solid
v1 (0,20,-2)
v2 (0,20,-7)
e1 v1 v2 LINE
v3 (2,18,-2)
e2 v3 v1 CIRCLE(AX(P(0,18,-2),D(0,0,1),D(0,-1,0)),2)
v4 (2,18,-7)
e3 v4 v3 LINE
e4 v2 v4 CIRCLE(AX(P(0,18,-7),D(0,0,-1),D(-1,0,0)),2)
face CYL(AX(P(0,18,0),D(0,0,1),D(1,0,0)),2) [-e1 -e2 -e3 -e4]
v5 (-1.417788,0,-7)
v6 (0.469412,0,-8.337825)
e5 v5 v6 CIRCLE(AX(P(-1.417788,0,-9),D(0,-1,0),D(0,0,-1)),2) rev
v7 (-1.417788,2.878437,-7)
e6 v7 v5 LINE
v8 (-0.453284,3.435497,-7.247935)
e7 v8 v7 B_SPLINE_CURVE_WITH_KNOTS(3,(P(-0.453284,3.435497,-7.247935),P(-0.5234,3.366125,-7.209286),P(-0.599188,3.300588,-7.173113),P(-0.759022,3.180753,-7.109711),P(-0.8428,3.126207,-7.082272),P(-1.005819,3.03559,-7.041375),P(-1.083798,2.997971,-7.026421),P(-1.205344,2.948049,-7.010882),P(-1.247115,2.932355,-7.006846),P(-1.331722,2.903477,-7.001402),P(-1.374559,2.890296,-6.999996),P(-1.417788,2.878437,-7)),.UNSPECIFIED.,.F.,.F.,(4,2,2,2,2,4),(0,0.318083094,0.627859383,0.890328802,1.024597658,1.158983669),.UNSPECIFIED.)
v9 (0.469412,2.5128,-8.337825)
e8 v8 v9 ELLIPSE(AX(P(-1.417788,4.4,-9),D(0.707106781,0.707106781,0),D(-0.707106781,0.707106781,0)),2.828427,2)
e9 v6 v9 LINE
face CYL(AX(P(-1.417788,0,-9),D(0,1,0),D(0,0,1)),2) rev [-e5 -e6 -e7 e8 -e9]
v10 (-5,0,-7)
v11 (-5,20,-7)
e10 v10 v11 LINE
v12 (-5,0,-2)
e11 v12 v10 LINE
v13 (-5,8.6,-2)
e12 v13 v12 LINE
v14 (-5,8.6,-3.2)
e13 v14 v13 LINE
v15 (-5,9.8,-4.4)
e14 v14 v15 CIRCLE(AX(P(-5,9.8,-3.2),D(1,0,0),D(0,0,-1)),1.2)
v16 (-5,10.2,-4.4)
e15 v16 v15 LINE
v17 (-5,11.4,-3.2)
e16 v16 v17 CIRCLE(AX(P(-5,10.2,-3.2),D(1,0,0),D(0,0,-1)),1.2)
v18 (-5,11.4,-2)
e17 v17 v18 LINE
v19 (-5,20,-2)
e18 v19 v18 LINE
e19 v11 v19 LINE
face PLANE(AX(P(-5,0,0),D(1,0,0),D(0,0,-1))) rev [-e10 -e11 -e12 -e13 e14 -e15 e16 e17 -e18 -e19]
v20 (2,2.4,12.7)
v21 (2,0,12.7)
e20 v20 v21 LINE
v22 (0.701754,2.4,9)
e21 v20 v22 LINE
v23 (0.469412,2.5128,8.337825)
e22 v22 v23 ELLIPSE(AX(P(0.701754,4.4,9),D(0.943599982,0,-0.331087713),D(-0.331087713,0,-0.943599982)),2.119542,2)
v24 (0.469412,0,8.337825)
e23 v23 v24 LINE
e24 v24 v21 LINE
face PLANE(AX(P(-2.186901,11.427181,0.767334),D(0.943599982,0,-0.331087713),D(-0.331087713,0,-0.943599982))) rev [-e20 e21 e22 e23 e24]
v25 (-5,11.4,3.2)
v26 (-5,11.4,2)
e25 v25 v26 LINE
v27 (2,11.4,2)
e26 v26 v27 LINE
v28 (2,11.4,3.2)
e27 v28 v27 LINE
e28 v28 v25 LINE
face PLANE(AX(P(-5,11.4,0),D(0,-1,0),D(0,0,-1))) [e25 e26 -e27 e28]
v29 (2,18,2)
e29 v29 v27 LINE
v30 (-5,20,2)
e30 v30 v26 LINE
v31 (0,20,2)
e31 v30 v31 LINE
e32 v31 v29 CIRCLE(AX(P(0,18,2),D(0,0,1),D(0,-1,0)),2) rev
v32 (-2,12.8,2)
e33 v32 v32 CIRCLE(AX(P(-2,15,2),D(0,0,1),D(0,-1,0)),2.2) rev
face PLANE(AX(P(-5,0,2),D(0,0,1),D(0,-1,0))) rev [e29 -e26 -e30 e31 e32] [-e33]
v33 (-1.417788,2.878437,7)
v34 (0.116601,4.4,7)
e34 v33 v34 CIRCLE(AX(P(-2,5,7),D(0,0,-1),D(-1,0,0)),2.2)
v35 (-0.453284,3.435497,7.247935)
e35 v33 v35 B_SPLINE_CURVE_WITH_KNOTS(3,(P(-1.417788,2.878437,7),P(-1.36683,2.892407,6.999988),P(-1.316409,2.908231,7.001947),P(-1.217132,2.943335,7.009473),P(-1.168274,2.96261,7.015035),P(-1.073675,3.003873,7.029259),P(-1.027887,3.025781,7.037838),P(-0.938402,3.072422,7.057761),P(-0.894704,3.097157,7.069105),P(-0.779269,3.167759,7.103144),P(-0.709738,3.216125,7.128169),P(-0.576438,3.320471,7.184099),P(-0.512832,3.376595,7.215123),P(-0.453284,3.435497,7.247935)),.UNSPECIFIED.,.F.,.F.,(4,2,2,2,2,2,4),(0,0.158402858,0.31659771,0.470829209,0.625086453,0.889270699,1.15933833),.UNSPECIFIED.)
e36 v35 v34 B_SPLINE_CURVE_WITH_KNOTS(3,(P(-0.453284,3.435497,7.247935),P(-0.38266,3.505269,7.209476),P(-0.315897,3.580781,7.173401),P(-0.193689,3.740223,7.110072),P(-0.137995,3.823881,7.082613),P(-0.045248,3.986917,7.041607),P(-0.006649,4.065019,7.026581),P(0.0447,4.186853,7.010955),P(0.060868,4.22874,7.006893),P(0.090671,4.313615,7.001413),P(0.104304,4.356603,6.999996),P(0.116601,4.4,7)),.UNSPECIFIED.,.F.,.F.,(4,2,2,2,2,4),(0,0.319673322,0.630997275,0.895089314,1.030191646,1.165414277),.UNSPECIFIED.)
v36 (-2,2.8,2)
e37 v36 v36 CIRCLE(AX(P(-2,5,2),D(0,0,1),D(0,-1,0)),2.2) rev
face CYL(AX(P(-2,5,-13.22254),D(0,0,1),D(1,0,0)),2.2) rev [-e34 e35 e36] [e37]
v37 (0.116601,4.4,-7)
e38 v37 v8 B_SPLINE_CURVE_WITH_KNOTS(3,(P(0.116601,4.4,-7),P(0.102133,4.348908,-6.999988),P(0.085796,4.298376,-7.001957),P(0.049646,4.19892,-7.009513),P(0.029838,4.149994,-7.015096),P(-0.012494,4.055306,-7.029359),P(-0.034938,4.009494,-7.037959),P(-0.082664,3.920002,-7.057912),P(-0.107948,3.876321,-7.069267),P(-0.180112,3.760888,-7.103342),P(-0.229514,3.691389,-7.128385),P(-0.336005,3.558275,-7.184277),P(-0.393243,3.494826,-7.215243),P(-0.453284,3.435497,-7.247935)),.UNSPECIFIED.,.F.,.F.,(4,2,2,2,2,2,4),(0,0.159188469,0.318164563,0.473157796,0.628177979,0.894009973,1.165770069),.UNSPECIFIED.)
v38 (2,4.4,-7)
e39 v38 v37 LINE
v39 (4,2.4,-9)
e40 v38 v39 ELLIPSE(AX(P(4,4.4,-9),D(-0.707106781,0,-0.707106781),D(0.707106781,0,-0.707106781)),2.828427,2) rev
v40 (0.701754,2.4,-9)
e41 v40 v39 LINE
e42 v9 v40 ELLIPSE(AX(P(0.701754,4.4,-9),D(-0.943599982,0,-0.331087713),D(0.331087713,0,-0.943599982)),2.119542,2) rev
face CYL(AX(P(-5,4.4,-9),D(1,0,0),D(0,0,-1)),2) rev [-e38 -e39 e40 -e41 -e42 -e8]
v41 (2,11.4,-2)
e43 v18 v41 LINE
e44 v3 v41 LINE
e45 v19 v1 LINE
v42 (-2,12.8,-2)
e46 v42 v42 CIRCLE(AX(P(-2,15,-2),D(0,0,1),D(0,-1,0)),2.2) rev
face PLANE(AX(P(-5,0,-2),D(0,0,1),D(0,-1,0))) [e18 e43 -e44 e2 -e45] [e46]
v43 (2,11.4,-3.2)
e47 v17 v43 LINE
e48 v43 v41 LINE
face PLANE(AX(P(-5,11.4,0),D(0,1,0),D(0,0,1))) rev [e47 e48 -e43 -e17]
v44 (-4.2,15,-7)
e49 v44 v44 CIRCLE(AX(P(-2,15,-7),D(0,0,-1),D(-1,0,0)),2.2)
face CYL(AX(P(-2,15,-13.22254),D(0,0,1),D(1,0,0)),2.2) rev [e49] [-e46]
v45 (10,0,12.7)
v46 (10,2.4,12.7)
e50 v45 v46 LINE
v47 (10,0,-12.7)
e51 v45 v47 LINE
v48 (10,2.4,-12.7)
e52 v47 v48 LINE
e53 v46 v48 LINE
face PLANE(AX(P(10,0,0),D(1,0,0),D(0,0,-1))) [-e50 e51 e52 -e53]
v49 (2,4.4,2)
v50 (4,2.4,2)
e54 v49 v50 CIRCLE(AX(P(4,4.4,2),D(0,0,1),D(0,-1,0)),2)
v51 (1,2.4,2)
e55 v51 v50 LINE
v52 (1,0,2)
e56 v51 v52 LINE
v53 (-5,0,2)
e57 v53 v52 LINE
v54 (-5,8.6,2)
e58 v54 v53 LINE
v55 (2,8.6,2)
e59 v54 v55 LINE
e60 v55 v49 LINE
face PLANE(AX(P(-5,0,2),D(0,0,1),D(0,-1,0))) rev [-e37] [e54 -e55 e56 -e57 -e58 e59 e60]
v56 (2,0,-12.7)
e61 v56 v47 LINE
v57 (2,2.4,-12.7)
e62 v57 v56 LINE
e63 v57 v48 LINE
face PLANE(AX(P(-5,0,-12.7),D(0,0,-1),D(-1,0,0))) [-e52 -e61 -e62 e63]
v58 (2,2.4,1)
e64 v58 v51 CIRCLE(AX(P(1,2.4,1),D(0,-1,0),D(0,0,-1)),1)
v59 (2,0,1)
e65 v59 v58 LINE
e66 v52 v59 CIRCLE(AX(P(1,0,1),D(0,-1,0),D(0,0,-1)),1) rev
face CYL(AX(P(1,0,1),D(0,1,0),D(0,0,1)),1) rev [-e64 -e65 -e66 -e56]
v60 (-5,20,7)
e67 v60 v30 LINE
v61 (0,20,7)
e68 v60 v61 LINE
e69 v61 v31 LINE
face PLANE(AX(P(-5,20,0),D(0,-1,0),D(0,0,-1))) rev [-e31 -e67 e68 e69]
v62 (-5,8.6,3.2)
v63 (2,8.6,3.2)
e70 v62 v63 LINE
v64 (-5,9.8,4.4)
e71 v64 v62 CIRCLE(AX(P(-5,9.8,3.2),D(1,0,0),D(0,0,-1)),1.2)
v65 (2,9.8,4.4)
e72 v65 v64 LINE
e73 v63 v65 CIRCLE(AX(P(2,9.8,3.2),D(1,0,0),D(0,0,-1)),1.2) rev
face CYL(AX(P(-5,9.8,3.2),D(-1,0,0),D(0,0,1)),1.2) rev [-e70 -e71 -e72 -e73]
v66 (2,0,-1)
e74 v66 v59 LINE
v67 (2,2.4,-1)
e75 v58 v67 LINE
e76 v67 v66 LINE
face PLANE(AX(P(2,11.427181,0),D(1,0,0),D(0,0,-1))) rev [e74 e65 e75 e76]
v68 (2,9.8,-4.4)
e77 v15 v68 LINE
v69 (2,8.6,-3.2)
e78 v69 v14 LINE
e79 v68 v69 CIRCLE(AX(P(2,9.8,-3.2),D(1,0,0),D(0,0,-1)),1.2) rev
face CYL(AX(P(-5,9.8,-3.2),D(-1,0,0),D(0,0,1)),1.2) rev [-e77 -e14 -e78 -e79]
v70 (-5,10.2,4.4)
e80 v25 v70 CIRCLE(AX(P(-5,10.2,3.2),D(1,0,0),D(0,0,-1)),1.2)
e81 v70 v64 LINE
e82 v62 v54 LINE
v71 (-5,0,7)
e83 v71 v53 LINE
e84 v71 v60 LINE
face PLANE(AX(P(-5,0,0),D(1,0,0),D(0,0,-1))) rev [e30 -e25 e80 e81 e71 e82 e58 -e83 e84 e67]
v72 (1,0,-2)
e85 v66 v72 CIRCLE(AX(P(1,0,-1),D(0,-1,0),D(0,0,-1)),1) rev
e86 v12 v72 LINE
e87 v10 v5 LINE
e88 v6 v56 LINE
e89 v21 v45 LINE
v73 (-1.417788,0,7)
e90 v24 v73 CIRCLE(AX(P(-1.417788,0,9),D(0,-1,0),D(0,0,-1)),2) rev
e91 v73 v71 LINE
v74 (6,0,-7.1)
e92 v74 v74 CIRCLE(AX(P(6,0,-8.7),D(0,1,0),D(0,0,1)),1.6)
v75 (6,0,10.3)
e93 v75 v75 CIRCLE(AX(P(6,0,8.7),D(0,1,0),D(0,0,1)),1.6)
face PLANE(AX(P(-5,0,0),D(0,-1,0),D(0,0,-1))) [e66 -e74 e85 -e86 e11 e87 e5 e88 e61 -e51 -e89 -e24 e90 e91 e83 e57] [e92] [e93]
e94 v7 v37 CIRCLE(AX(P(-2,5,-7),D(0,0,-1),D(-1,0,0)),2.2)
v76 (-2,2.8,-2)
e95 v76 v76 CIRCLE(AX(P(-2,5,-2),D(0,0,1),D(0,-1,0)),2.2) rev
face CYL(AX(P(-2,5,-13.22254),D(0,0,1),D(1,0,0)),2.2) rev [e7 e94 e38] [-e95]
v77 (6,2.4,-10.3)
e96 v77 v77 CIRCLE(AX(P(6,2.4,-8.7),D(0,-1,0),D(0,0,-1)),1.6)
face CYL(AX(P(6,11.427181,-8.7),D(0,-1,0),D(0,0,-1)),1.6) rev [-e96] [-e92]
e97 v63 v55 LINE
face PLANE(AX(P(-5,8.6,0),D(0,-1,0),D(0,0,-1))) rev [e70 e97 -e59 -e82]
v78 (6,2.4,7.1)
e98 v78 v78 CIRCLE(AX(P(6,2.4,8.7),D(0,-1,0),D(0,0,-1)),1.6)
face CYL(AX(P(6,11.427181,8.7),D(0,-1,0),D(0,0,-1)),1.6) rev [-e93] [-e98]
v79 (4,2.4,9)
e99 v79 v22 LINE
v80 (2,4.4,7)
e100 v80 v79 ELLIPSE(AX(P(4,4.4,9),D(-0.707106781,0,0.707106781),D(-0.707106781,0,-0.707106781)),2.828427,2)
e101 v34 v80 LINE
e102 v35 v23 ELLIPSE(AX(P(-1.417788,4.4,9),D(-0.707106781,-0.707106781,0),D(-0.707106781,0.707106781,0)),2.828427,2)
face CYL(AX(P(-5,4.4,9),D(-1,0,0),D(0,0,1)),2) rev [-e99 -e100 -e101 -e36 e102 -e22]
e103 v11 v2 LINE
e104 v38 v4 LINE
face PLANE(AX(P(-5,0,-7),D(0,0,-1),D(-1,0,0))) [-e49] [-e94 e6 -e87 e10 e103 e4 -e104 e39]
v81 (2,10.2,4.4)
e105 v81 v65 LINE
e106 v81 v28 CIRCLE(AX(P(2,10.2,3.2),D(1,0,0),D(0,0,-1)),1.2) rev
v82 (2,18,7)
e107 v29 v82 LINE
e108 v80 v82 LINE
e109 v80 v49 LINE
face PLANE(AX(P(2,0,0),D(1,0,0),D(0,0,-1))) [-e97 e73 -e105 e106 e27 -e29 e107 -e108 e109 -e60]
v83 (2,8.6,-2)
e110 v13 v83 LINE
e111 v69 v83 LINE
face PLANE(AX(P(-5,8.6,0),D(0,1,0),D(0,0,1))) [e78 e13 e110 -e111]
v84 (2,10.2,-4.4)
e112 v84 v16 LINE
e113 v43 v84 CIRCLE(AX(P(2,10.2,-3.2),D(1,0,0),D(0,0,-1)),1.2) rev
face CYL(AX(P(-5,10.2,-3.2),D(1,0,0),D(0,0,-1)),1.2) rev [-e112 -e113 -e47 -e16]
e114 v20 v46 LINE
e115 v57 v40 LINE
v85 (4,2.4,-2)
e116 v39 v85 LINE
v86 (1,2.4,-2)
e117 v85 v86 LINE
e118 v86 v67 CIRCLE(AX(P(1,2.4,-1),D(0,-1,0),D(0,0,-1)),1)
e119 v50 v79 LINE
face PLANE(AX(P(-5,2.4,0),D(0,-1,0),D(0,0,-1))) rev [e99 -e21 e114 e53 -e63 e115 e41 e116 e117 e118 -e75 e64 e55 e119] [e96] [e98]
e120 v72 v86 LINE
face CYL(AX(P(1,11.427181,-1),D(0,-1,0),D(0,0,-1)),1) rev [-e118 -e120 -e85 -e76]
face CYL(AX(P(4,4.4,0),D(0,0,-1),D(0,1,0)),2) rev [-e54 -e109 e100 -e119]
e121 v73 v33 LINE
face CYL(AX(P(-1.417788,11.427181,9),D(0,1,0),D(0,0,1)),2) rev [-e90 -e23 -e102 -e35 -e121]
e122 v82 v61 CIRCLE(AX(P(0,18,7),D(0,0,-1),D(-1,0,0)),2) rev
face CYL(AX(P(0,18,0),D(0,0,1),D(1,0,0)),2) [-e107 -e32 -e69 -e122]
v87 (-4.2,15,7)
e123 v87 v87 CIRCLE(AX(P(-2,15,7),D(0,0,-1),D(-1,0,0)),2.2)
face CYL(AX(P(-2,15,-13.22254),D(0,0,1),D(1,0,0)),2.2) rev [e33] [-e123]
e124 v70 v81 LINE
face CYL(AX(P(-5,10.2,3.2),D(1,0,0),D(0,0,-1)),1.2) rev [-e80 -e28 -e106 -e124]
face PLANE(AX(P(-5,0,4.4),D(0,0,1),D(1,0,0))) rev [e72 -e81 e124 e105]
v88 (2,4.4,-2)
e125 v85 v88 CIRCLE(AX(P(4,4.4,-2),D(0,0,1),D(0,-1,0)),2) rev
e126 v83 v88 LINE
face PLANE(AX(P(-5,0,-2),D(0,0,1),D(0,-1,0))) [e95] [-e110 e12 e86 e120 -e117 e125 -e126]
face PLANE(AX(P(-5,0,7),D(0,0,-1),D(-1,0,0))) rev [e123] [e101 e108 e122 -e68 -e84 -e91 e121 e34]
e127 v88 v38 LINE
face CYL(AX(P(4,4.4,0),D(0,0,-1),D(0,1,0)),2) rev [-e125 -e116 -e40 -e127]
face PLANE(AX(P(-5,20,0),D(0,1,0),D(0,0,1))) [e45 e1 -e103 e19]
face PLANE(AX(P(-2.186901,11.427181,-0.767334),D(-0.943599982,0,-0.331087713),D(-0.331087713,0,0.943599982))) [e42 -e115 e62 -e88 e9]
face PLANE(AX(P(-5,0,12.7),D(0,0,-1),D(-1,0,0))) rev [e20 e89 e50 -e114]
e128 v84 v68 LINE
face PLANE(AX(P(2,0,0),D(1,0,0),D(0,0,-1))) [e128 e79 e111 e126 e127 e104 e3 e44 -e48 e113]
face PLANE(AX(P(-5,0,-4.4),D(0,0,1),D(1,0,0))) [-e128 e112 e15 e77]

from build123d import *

# Parameters (mm, degrees)
SALIENTE_EXTRUIR1_DEPTH = 5
SALIENTE_EXTRUIR2_DEPTH = 10
SALIENTE_EXTRUIR3_DEPTH = 2
CORTAR_EXTRUIR1_START   = 7
CROQUIS2_R              = 2.2
CORTAR_EXTRUIR1_DEPTH   = 14
CROQUIS3_R              = 1.6
CROQUIS3_W              = 5
CROQUIS3_H              = 4
CROQUIS3_W_2            = 2
CORTAR_EXTRUIR2_DEPTH   = 2.4
REDONDEO1_R             = 2
REDONDEO2_R             = 2
REDONDEO3_R             = 1
REDONDEO4_R             = 1.2


with BuildPart() as part:
    # Croquis1 → Saliente-Extruir1 (new body)
    with BuildSketch(Plane(origin=(0, 0, 0), x_dir=(0, 0, -1), z_dir=(1, 0, 0))):
        Polygon((-12.7, 2.4), (-12.7, 0), (12.7, 0), (12.7, 2.4), (7, 2.4), (7, 20), (2, 20), (2, 11.4), (4.4, 11.4), (4.4, 8.6), (2, 8.6), (2, 2.4), (-2, 2.4), (-2, 8.6), (-4.4, 8.6), (-4.4, 11.4), (-2, 11.4), (-2, 20), (-7, 20), (-7, 2.4), align=None)
    extrude(amount=-SALIENTE_EXTRUIR1_DEPTH)

    # Croquis1<3> → Saliente-Extruir2 (add)
    with BuildSketch(Plane(origin=(0, 0, 0), x_dir=(0, 0, -1), z_dir=(1, 0, 0))):
        Polygon((2, 2.4), (7, 2.4), (12.7, 2.4), (12.7, 0), (-12.7, 0), (-12.7, 2.4), (-7, 2.4), (-2, 2.4), align=None)
    extrude(amount=SALIENTE_EXTRUIR2_DEPTH)

    # Croquis1<4> → Saliente-Extruir3 (add)
    with BuildSketch(Plane(origin=(0, 0, 0), x_dir=(0, 0, -1), z_dir=(1, 0, 0))):
        Polygon((-7, 20), (-7, 2.4), (-2, 2.4), (-2, 8.6), (-4.4, 8.6), (-4.4, 11.4), (-2, 11.4), (-2, 20), align=None)
        Polygon((2, 2.4), (7, 2.4), (7, 20), (2, 20), (2, 11.4), (4.4, 11.4), (4.4, 8.6), (2, 8.6), align=None)
    extrude(amount=SALIENTE_EXTRUIR3_DEPTH)

    # Croquis2 → Cortar-Extruir1 (cut)
    with BuildSketch(Plane.XY.offset(CORTAR_EXTRUIR1_START)):
        with Locations(Location((-2, 15, 0), (0, 0, 270))):
            Circle(CROQUIS2_R)
        with Locations(Location((-2, 5, 0), (0, 0, 270))):
            Circle(CROQUIS2_R)
    extrude(amount=-CORTAR_EXTRUIR1_DEPTH, mode=Mode.SUBTRACT)

    # Croquis3 → Cortar-Extruir2 (cut)
    with BuildSketch(Plane(origin=(0, 0, 0), x_dir=(1, 0, 0), z_dir=(0, 1, 0))):
        Polygon((-5, 7), (0, 7), (2, 12.7), (-5, 12.7), align=None)
        Polygon((2, -12.7), (0, -7), (-5, -7), (-5, -12.7), align=None)
        with Locations(Location((6, -8.7, 0), (0, 0, 90))):
            Circle(CROQUIS3_R)
        with Locations(Location((6, 8.7, 0), (0, 0, 90))):
            Circle(CROQUIS3_R)
        with Locations((-2.5, 0)):
            Rectangle(CROQUIS3_W, CROQUIS3_H)
        with Locations((1, 0)):
            Rectangle(CROQUIS3_W_2, CROQUIS3_H)
    extrude(amount=CORTAR_EXTRUIR2_DEPTH, mode=Mode.SUBTRACT)

    # Redondeo1
    redondeo1_edges = [part.edges().sort_by_distance(p)[0] for p in [
        (2, 20, -4.5),
        (2, 20, 4.5),
    ]]
    fillet(redondeo1_edges, radius=REDONDEO1_R)

    # Redondeo2
    # the kernel refuses this fillet: 2 mm, written as the material it adds along each edge
    with BuildSketch(Plane(origin=(2, 2.4, 3), x_dir=(1, 0, 0), z_dir=(0, 0, -1))) as redondeo2_piece_1_section:
        with BuildLine():
            CenterArc((REDONDEO2_R, -REDONDEO2_R), REDONDEO2_R, 90, 90)
            Line((0, -REDONDEO2_R), (0, 0))
            Line((0, 0), (REDONDEO2_R, 0))
        make_face()
    redondeo2_piece_1 = extrude(amount=15, mode=Mode.PRIVATE)
    redondeo2_piece_1 = split(redondeo2_piece_1, bisect_by=Plane(origin=(2, 2.4, 2), z_dir=(0, 0, 1)), keep=Keep.TOP, mode=Mode.PRIVATE)
    add(redondeo2_piece_1)
    with BuildSketch(Plane(origin=(2, 2.4, -2), x_dir=(1, 0, 0), z_dir=(0, 0, -1))) as redondeo2_piece_2:
        with BuildLine():
            CenterArc((REDONDEO2_R, -REDONDEO2_R), REDONDEO2_R, 90, 90)
            Line((0, -REDONDEO2_R), (0, 0))
            Line((0, 0), (REDONDEO2_R, 0))
        make_face()
    extrude(amount=5)
    with BuildSketch(Plane(origin=(-5, 2.4, -7), x_dir=(0, 0, -1), z_dir=(1, 0, 0))) as redondeo2_piece_3_section:
        with BuildLine():
            CenterArc((REDONDEO2_R, REDONDEO2_R), REDONDEO2_R, 180, 90)
            Line((0, REDONDEO2_R), (0, 0))
            Line((0, 0), (REDONDEO2_R, 0))
        make_face()
    redondeo2_piece_3 = extrude(amount=7, mode=Mode.PRIVATE)
    redondeo2_piece_3 = split(redondeo2_piece_3, bisect_by=Plane(origin=(-0.548095369, 2.4, -5.4379282), z_dir=(0.9435999821328808, 0, 0.331087713029081)), keep=Keep.TOP, mode=Mode.PRIVATE)
    redondeo2_piece_3 = redondeo2_piece_3 - Plane(origin=(-2, 5, -7), x_dir=(0, -1, 0), z_dir=(0, 0, 1)) * Cylinder(2.2, 22, mode=Mode.PRIVATE)
    add(redondeo2_piece_3)
    with BuildSketch(Plane(origin=(2, 2.4, 7), x_dir=(0, 1, 0), z_dir=(-1, 0, 0))) as redondeo2_piece_4_section:
        with BuildLine():
            CenterArc((REDONDEO2_R, -REDONDEO2_R), REDONDEO2_R, 90, 90)
            Line((0, -REDONDEO2_R), (0, 0))
            Line((0, 0), (REDONDEO2_R, 0))
        make_face()
    redondeo2_piece_4 = extrude(amount=7, mode=Mode.PRIVATE)
    redondeo2_piece_4 = split(redondeo2_piece_4, bisect_by=Plane(origin=(0.219238147, 2.4, 7.62482872), z_dir=(0.9435999821328808, 0, -0.331087713029081)), keep=Keep.TOP, mode=Mode.PRIVATE)
    redondeo2_piece_4 = redondeo2_piece_4 - Plane(origin=(-2, 5, 7), x_dir=(0, -1, 0), z_dir=(0, 0, 1)) * Cylinder(2.2, 22, mode=Mode.PRIVATE)
    add(redondeo2_piece_4)
    with BuildSketch(Plane(origin=(0, 0, 7), x_dir=(-1, 0, 0), z_dir=(0, 1, 0))) as redondeo2_piece_5:
        with BuildLine():
            CenterArc((REDONDEO2_R * 0.708893916529, REDONDEO2_R), REDONDEO2_R, 199.334808538, 70.665191462)
            Line((-REDONDEO2_R * 0.234706065604, REDONDEO2_R * 0.668912286971), (0, 0))
            Line((0, 0), (REDONDEO2_R * 0.708893916529, 0))
        make_face()
    extrude(amount=2.4)
    with BuildSketch(Plane(origin=(0, 0, -7), x_dir=(-1, 0, 0), z_dir=(0, 1, 0))) as redondeo2_piece_6:
        with BuildLine():
            CenterArc((REDONDEO2_R * 0.708893916529, -REDONDEO2_R), REDONDEO2_R, 90, 70.665191462)
            Line((-REDONDEO2_R * 0.234706065604, -REDONDEO2_R * 0.668912286971), (0, 0))
            Line((0, 0), (REDONDEO2_R * 0.708893916529, 0))
        make_face()
    extrude(amount=2.4)
    with BuildSketch(Plane(origin=(2, 2.4, 7), x_dir=(0, 1, 0), z_dir=(0, 0, -1))) as redondeo2_piece_7:
        with BuildLine():
            CenterArc((REDONDEO2_R, REDONDEO2_R), REDONDEO2_R, 180, 90)
            Line((0, REDONDEO2_R), (0, 0))
            Line((0, 0), (REDONDEO2_R, 0))
        make_face()
    extrude(amount=5)
    with BuildSketch(Plane(origin=(2, 2.4, 12), x_dir=(0, 1, 0), z_dir=(0, 0, -1))) as redondeo2_piece_8_section:
        with BuildLine():
            CenterArc((REDONDEO2_R, REDONDEO2_R), REDONDEO2_R, 180, 90)
            Line((0, REDONDEO2_R), (0, 0))
            Line((0, 0), (REDONDEO2_R, 0))
        make_face()
    redondeo2_piece_8 = extrude(amount=15, mode=Mode.PRIVATE)
    redondeo2_piece_8 = split(redondeo2_piece_8, bisect_by=Plane(origin=(2, 2.4, -2), z_dir=(0, 0, -1)), keep=Keep.TOP, mode=Mode.PRIVATE)
    add(redondeo2_piece_8)
    with BuildSketch(Plane(origin=(2, 2.4, -2), x_dir=(1, 0, 0), z_dir=(0, 0, -1))) as redondeo2_piece_9a_section:
        with BuildLine():
            CenterArc((REDONDEO2_R, -REDONDEO2_R), REDONDEO2_R, 90, 90)
            Line((0, -REDONDEO2_R), (0, 0))
            Line((0, 0), (REDONDEO2_R, 0))
        make_face()
    redondeo2_piece_9a = extrude(amount=10, mode=Mode.PRIVATE)
    redondeo2_piece_9a = split(redondeo2_piece_9a, bisect_by=Plane(origin=(2, 2.4, -7), z_dir=(0, 0, -1)), keep=Keep.TOP, mode=Mode.PRIVATE)
    with BuildSketch(Plane(origin=(-5, 2.4, -7), x_dir=(0, 0, -1), z_dir=(1, 0, 0))) as redondeo2_piece_9b_section:
        with BuildLine():
            CenterArc((REDONDEO2_R, REDONDEO2_R), REDONDEO2_R, 180, 90)
            Line((0, REDONDEO2_R), (0, 0))
            Line((0, 0), (REDONDEO2_R, 0))
        make_face()
    redondeo2_piece_9b = extrude(amount=12, mode=Mode.PRIVATE)
    redondeo2_piece_9b = split(redondeo2_piece_9b, bisect_by=Plane(origin=(2, 2.4, -7), z_dir=(1, 0, 0)), keep=Keep.TOP, mode=Mode.PRIVATE)
    redondeo2_piece_9b = redondeo2_piece_9b - Plane(origin=(6, 2.4, -8.7), x_dir=(0, 0, -1), z_dir=(0, -1, 0)) * Cylinder(1.6, 32, mode=Mode.PRIVATE)
    redondeo2_piece_9 = redondeo2_piece_9a & redondeo2_piece_9b
    add(redondeo2_piece_9)
    with BuildSketch(Plane(origin=(-5, 2.4, -7), x_dir=(0, 0, -1), z_dir=(1, 0, 0))) as redondeo2_piece_10a_section:
        with BuildLine():
            CenterArc((REDONDEO2_R, REDONDEO2_R), REDONDEO2_R, 180, 90)
            Line((0, REDONDEO2_R), (0, 0))
            Line((0, 0), (REDONDEO2_R, 0))
        make_face()
    redondeo2_piece_10a = extrude(amount=7, mode=Mode.PRIVATE)
    redondeo2_piece_10a = split(redondeo2_piece_10a, bisect_by=Plane(origin=(-0.548095369, 2.4, -5.4379282), z_dir=(-0.9435999821328808, 0, -0.331087713029081)), keep=Keep.TOP, mode=Mode.PRIVATE)
    redondeo2_piece_10a = redondeo2_piece_10a - Plane(origin=(-2, 5, -7), x_dir=(0, -1, 0), z_dir=(0, 0, 1)) * Cylinder(2.2, 22, mode=Mode.PRIVATE)
    with BuildSketch(Plane(origin=(0, 0, -7), x_dir=(-1, 0, 0), z_dir=(0, 1, 0))) as redondeo2_piece_10b_section:
        with BuildLine():
            CenterArc((REDONDEO2_R * 0.708893916529, -REDONDEO2_R), REDONDEO2_R, 90, 70.665191462)
            Line((-REDONDEO2_R * 0.234706065604, -REDONDEO2_R * 0.668912286971), (0, 0))
            Line((0, 0), (REDONDEO2_R * 0.708893916529, 0))
        make_face()
    redondeo2_piece_10b = extrude(amount=5.944469583, mode=Mode.PRIVATE)
    redondeo2_piece_10b = split(redondeo2_piece_10b, bisect_by=Plane(origin=(0, 2.4, -7), z_dir=(0, 1, 0)), keep=Keep.TOP, mode=Mode.PRIVATE)
    redondeo2_piece_10b = redondeo2_piece_10b - Plane(origin=(-2, 5, -7), x_dir=(0, -1, 0), z_dir=(0, 0, 1)) * Cylinder(2.2, 18, mode=Mode.PRIVATE)
    redondeo2_piece_10 = redondeo2_piece_10a & redondeo2_piece_10b
    add(redondeo2_piece_10)
    with BuildSketch(Plane(origin=(7, 2.4, 7), x_dir=(0, 1, 0), z_dir=(-1, 0, 0))) as redondeo2_piece_11a_section:
        with BuildLine():
            CenterArc((REDONDEO2_R, -REDONDEO2_R), REDONDEO2_R, 90, 90)
            Line((0, -REDONDEO2_R), (0, 0))
            Line((0, 0), (REDONDEO2_R, 0))
        make_face()
    redondeo2_piece_11a = extrude(amount=12, mode=Mode.PRIVATE)
    redondeo2_piece_11a = split(redondeo2_piece_11a, bisect_by=Plane(origin=(2, 2.4, 7), z_dir=(1, 0, 0)), keep=Keep.TOP, mode=Mode.PRIVATE)
    redondeo2_piece_11a = redondeo2_piece_11a - Plane(origin=(6, 2.4, 8.7), x_dir=(0, 0, -1), z_dir=(0, -1, 0)) * Cylinder(1.6, 32, mode=Mode.PRIVATE)
    with BuildSketch(Plane(origin=(2, 2.4, 12), x_dir=(0, 1, 0), z_dir=(0, 0, -1))) as redondeo2_piece_11b_section:
        with BuildLine():
            CenterArc((REDONDEO2_R, REDONDEO2_R), REDONDEO2_R, 180, 90)
            Line((0, REDONDEO2_R), (0, 0))
            Line((0, 0), (REDONDEO2_R, 0))
        make_face()
    redondeo2_piece_11b = extrude(amount=10, mode=Mode.PRIVATE)
    redondeo2_piece_11b = split(redondeo2_piece_11b, bisect_by=Plane(origin=(2, 2.4, 7), z_dir=(0, 0, 1)), keep=Keep.TOP, mode=Mode.PRIVATE)
    redondeo2_piece_11 = redondeo2_piece_11a & redondeo2_piece_11b
    add(redondeo2_piece_11)
    with BuildSketch(Plane(origin=(2, 2.4, 7), x_dir=(0, 1, 0), z_dir=(-1, 0, 0))) as redondeo2_piece_12a_section:
        with BuildLine():
            CenterArc((REDONDEO2_R, -REDONDEO2_R), REDONDEO2_R, 90, 90)
            Line((0, -REDONDEO2_R), (0, 0))
            Line((0, 0), (REDONDEO2_R, 0))
        make_face()
    redondeo2_piece_12a = extrude(amount=7, mode=Mode.PRIVATE)
    redondeo2_piece_12a = split(redondeo2_piece_12a, bisect_by=Plane(origin=(0.219238147, 2.4, 7.62482872), z_dir=(-0.9435999821328808, 0, 0.331087713029081)), keep=Keep.TOP, mode=Mode.PRIVATE)
    redondeo2_piece_12a = redondeo2_piece_12a - Plane(origin=(-2, 5, 7), x_dir=(0, -1, 0), z_dir=(0, 0, 1)) * Cylinder(2.2, 22, mode=Mode.PRIVATE)
    with BuildSketch(Plane(origin=(0, 0, 7), x_dir=(-1, 0, 0), z_dir=(0, 1, 0))) as redondeo2_piece_12b_section:
        with BuildLine():
            CenterArc((REDONDEO2_R * 0.708893916529, REDONDEO2_R), REDONDEO2_R, 199.334808538, 70.665191462)
            Line((-REDONDEO2_R * 0.234706065604, REDONDEO2_R * 0.668912286971), (0, 0))
            Line((0, 0), (REDONDEO2_R * 0.708893916529, 0))
        make_face()
    redondeo2_piece_12b = extrude(amount=5.944469583, mode=Mode.PRIVATE)
    redondeo2_piece_12b = split(redondeo2_piece_12b, bisect_by=Plane(origin=(0, 2.4, 7), z_dir=(0, 1, 0)), keep=Keep.TOP, mode=Mode.PRIVATE)
    redondeo2_piece_12b = redondeo2_piece_12b - Plane(origin=(-2, 5, 7), x_dir=(0, -1, 0), z_dir=(0, 0, 1)) * Cylinder(2.2, 18, mode=Mode.PRIVATE)
    redondeo2_piece_12 = redondeo2_piece_12a & redondeo2_piece_12b
    add(redondeo2_piece_12)

    # Redondeo3
    redondeo3_edges = [part.edges().sort_by_distance(p)[0] for p in [
        (2, 1.2, 2),
        (2, 1.2, -2),
    ]]
    fillet(redondeo3_edges, radius=REDONDEO3_R)

    # Redondeo4
    redondeo4_edges = [part.edges().sort_by_distance(p)[0] for p in [
        (-1.5, 11.4, 4.4),
        (-1.5, 8.6, 4.4),
        (-1.5, 8.6, -4.4),
        (-1.5, 11.4, -4.4),
    ]]
    fillet(redondeo4_edges, radius=REDONDEO4_R)


solid = part.part
